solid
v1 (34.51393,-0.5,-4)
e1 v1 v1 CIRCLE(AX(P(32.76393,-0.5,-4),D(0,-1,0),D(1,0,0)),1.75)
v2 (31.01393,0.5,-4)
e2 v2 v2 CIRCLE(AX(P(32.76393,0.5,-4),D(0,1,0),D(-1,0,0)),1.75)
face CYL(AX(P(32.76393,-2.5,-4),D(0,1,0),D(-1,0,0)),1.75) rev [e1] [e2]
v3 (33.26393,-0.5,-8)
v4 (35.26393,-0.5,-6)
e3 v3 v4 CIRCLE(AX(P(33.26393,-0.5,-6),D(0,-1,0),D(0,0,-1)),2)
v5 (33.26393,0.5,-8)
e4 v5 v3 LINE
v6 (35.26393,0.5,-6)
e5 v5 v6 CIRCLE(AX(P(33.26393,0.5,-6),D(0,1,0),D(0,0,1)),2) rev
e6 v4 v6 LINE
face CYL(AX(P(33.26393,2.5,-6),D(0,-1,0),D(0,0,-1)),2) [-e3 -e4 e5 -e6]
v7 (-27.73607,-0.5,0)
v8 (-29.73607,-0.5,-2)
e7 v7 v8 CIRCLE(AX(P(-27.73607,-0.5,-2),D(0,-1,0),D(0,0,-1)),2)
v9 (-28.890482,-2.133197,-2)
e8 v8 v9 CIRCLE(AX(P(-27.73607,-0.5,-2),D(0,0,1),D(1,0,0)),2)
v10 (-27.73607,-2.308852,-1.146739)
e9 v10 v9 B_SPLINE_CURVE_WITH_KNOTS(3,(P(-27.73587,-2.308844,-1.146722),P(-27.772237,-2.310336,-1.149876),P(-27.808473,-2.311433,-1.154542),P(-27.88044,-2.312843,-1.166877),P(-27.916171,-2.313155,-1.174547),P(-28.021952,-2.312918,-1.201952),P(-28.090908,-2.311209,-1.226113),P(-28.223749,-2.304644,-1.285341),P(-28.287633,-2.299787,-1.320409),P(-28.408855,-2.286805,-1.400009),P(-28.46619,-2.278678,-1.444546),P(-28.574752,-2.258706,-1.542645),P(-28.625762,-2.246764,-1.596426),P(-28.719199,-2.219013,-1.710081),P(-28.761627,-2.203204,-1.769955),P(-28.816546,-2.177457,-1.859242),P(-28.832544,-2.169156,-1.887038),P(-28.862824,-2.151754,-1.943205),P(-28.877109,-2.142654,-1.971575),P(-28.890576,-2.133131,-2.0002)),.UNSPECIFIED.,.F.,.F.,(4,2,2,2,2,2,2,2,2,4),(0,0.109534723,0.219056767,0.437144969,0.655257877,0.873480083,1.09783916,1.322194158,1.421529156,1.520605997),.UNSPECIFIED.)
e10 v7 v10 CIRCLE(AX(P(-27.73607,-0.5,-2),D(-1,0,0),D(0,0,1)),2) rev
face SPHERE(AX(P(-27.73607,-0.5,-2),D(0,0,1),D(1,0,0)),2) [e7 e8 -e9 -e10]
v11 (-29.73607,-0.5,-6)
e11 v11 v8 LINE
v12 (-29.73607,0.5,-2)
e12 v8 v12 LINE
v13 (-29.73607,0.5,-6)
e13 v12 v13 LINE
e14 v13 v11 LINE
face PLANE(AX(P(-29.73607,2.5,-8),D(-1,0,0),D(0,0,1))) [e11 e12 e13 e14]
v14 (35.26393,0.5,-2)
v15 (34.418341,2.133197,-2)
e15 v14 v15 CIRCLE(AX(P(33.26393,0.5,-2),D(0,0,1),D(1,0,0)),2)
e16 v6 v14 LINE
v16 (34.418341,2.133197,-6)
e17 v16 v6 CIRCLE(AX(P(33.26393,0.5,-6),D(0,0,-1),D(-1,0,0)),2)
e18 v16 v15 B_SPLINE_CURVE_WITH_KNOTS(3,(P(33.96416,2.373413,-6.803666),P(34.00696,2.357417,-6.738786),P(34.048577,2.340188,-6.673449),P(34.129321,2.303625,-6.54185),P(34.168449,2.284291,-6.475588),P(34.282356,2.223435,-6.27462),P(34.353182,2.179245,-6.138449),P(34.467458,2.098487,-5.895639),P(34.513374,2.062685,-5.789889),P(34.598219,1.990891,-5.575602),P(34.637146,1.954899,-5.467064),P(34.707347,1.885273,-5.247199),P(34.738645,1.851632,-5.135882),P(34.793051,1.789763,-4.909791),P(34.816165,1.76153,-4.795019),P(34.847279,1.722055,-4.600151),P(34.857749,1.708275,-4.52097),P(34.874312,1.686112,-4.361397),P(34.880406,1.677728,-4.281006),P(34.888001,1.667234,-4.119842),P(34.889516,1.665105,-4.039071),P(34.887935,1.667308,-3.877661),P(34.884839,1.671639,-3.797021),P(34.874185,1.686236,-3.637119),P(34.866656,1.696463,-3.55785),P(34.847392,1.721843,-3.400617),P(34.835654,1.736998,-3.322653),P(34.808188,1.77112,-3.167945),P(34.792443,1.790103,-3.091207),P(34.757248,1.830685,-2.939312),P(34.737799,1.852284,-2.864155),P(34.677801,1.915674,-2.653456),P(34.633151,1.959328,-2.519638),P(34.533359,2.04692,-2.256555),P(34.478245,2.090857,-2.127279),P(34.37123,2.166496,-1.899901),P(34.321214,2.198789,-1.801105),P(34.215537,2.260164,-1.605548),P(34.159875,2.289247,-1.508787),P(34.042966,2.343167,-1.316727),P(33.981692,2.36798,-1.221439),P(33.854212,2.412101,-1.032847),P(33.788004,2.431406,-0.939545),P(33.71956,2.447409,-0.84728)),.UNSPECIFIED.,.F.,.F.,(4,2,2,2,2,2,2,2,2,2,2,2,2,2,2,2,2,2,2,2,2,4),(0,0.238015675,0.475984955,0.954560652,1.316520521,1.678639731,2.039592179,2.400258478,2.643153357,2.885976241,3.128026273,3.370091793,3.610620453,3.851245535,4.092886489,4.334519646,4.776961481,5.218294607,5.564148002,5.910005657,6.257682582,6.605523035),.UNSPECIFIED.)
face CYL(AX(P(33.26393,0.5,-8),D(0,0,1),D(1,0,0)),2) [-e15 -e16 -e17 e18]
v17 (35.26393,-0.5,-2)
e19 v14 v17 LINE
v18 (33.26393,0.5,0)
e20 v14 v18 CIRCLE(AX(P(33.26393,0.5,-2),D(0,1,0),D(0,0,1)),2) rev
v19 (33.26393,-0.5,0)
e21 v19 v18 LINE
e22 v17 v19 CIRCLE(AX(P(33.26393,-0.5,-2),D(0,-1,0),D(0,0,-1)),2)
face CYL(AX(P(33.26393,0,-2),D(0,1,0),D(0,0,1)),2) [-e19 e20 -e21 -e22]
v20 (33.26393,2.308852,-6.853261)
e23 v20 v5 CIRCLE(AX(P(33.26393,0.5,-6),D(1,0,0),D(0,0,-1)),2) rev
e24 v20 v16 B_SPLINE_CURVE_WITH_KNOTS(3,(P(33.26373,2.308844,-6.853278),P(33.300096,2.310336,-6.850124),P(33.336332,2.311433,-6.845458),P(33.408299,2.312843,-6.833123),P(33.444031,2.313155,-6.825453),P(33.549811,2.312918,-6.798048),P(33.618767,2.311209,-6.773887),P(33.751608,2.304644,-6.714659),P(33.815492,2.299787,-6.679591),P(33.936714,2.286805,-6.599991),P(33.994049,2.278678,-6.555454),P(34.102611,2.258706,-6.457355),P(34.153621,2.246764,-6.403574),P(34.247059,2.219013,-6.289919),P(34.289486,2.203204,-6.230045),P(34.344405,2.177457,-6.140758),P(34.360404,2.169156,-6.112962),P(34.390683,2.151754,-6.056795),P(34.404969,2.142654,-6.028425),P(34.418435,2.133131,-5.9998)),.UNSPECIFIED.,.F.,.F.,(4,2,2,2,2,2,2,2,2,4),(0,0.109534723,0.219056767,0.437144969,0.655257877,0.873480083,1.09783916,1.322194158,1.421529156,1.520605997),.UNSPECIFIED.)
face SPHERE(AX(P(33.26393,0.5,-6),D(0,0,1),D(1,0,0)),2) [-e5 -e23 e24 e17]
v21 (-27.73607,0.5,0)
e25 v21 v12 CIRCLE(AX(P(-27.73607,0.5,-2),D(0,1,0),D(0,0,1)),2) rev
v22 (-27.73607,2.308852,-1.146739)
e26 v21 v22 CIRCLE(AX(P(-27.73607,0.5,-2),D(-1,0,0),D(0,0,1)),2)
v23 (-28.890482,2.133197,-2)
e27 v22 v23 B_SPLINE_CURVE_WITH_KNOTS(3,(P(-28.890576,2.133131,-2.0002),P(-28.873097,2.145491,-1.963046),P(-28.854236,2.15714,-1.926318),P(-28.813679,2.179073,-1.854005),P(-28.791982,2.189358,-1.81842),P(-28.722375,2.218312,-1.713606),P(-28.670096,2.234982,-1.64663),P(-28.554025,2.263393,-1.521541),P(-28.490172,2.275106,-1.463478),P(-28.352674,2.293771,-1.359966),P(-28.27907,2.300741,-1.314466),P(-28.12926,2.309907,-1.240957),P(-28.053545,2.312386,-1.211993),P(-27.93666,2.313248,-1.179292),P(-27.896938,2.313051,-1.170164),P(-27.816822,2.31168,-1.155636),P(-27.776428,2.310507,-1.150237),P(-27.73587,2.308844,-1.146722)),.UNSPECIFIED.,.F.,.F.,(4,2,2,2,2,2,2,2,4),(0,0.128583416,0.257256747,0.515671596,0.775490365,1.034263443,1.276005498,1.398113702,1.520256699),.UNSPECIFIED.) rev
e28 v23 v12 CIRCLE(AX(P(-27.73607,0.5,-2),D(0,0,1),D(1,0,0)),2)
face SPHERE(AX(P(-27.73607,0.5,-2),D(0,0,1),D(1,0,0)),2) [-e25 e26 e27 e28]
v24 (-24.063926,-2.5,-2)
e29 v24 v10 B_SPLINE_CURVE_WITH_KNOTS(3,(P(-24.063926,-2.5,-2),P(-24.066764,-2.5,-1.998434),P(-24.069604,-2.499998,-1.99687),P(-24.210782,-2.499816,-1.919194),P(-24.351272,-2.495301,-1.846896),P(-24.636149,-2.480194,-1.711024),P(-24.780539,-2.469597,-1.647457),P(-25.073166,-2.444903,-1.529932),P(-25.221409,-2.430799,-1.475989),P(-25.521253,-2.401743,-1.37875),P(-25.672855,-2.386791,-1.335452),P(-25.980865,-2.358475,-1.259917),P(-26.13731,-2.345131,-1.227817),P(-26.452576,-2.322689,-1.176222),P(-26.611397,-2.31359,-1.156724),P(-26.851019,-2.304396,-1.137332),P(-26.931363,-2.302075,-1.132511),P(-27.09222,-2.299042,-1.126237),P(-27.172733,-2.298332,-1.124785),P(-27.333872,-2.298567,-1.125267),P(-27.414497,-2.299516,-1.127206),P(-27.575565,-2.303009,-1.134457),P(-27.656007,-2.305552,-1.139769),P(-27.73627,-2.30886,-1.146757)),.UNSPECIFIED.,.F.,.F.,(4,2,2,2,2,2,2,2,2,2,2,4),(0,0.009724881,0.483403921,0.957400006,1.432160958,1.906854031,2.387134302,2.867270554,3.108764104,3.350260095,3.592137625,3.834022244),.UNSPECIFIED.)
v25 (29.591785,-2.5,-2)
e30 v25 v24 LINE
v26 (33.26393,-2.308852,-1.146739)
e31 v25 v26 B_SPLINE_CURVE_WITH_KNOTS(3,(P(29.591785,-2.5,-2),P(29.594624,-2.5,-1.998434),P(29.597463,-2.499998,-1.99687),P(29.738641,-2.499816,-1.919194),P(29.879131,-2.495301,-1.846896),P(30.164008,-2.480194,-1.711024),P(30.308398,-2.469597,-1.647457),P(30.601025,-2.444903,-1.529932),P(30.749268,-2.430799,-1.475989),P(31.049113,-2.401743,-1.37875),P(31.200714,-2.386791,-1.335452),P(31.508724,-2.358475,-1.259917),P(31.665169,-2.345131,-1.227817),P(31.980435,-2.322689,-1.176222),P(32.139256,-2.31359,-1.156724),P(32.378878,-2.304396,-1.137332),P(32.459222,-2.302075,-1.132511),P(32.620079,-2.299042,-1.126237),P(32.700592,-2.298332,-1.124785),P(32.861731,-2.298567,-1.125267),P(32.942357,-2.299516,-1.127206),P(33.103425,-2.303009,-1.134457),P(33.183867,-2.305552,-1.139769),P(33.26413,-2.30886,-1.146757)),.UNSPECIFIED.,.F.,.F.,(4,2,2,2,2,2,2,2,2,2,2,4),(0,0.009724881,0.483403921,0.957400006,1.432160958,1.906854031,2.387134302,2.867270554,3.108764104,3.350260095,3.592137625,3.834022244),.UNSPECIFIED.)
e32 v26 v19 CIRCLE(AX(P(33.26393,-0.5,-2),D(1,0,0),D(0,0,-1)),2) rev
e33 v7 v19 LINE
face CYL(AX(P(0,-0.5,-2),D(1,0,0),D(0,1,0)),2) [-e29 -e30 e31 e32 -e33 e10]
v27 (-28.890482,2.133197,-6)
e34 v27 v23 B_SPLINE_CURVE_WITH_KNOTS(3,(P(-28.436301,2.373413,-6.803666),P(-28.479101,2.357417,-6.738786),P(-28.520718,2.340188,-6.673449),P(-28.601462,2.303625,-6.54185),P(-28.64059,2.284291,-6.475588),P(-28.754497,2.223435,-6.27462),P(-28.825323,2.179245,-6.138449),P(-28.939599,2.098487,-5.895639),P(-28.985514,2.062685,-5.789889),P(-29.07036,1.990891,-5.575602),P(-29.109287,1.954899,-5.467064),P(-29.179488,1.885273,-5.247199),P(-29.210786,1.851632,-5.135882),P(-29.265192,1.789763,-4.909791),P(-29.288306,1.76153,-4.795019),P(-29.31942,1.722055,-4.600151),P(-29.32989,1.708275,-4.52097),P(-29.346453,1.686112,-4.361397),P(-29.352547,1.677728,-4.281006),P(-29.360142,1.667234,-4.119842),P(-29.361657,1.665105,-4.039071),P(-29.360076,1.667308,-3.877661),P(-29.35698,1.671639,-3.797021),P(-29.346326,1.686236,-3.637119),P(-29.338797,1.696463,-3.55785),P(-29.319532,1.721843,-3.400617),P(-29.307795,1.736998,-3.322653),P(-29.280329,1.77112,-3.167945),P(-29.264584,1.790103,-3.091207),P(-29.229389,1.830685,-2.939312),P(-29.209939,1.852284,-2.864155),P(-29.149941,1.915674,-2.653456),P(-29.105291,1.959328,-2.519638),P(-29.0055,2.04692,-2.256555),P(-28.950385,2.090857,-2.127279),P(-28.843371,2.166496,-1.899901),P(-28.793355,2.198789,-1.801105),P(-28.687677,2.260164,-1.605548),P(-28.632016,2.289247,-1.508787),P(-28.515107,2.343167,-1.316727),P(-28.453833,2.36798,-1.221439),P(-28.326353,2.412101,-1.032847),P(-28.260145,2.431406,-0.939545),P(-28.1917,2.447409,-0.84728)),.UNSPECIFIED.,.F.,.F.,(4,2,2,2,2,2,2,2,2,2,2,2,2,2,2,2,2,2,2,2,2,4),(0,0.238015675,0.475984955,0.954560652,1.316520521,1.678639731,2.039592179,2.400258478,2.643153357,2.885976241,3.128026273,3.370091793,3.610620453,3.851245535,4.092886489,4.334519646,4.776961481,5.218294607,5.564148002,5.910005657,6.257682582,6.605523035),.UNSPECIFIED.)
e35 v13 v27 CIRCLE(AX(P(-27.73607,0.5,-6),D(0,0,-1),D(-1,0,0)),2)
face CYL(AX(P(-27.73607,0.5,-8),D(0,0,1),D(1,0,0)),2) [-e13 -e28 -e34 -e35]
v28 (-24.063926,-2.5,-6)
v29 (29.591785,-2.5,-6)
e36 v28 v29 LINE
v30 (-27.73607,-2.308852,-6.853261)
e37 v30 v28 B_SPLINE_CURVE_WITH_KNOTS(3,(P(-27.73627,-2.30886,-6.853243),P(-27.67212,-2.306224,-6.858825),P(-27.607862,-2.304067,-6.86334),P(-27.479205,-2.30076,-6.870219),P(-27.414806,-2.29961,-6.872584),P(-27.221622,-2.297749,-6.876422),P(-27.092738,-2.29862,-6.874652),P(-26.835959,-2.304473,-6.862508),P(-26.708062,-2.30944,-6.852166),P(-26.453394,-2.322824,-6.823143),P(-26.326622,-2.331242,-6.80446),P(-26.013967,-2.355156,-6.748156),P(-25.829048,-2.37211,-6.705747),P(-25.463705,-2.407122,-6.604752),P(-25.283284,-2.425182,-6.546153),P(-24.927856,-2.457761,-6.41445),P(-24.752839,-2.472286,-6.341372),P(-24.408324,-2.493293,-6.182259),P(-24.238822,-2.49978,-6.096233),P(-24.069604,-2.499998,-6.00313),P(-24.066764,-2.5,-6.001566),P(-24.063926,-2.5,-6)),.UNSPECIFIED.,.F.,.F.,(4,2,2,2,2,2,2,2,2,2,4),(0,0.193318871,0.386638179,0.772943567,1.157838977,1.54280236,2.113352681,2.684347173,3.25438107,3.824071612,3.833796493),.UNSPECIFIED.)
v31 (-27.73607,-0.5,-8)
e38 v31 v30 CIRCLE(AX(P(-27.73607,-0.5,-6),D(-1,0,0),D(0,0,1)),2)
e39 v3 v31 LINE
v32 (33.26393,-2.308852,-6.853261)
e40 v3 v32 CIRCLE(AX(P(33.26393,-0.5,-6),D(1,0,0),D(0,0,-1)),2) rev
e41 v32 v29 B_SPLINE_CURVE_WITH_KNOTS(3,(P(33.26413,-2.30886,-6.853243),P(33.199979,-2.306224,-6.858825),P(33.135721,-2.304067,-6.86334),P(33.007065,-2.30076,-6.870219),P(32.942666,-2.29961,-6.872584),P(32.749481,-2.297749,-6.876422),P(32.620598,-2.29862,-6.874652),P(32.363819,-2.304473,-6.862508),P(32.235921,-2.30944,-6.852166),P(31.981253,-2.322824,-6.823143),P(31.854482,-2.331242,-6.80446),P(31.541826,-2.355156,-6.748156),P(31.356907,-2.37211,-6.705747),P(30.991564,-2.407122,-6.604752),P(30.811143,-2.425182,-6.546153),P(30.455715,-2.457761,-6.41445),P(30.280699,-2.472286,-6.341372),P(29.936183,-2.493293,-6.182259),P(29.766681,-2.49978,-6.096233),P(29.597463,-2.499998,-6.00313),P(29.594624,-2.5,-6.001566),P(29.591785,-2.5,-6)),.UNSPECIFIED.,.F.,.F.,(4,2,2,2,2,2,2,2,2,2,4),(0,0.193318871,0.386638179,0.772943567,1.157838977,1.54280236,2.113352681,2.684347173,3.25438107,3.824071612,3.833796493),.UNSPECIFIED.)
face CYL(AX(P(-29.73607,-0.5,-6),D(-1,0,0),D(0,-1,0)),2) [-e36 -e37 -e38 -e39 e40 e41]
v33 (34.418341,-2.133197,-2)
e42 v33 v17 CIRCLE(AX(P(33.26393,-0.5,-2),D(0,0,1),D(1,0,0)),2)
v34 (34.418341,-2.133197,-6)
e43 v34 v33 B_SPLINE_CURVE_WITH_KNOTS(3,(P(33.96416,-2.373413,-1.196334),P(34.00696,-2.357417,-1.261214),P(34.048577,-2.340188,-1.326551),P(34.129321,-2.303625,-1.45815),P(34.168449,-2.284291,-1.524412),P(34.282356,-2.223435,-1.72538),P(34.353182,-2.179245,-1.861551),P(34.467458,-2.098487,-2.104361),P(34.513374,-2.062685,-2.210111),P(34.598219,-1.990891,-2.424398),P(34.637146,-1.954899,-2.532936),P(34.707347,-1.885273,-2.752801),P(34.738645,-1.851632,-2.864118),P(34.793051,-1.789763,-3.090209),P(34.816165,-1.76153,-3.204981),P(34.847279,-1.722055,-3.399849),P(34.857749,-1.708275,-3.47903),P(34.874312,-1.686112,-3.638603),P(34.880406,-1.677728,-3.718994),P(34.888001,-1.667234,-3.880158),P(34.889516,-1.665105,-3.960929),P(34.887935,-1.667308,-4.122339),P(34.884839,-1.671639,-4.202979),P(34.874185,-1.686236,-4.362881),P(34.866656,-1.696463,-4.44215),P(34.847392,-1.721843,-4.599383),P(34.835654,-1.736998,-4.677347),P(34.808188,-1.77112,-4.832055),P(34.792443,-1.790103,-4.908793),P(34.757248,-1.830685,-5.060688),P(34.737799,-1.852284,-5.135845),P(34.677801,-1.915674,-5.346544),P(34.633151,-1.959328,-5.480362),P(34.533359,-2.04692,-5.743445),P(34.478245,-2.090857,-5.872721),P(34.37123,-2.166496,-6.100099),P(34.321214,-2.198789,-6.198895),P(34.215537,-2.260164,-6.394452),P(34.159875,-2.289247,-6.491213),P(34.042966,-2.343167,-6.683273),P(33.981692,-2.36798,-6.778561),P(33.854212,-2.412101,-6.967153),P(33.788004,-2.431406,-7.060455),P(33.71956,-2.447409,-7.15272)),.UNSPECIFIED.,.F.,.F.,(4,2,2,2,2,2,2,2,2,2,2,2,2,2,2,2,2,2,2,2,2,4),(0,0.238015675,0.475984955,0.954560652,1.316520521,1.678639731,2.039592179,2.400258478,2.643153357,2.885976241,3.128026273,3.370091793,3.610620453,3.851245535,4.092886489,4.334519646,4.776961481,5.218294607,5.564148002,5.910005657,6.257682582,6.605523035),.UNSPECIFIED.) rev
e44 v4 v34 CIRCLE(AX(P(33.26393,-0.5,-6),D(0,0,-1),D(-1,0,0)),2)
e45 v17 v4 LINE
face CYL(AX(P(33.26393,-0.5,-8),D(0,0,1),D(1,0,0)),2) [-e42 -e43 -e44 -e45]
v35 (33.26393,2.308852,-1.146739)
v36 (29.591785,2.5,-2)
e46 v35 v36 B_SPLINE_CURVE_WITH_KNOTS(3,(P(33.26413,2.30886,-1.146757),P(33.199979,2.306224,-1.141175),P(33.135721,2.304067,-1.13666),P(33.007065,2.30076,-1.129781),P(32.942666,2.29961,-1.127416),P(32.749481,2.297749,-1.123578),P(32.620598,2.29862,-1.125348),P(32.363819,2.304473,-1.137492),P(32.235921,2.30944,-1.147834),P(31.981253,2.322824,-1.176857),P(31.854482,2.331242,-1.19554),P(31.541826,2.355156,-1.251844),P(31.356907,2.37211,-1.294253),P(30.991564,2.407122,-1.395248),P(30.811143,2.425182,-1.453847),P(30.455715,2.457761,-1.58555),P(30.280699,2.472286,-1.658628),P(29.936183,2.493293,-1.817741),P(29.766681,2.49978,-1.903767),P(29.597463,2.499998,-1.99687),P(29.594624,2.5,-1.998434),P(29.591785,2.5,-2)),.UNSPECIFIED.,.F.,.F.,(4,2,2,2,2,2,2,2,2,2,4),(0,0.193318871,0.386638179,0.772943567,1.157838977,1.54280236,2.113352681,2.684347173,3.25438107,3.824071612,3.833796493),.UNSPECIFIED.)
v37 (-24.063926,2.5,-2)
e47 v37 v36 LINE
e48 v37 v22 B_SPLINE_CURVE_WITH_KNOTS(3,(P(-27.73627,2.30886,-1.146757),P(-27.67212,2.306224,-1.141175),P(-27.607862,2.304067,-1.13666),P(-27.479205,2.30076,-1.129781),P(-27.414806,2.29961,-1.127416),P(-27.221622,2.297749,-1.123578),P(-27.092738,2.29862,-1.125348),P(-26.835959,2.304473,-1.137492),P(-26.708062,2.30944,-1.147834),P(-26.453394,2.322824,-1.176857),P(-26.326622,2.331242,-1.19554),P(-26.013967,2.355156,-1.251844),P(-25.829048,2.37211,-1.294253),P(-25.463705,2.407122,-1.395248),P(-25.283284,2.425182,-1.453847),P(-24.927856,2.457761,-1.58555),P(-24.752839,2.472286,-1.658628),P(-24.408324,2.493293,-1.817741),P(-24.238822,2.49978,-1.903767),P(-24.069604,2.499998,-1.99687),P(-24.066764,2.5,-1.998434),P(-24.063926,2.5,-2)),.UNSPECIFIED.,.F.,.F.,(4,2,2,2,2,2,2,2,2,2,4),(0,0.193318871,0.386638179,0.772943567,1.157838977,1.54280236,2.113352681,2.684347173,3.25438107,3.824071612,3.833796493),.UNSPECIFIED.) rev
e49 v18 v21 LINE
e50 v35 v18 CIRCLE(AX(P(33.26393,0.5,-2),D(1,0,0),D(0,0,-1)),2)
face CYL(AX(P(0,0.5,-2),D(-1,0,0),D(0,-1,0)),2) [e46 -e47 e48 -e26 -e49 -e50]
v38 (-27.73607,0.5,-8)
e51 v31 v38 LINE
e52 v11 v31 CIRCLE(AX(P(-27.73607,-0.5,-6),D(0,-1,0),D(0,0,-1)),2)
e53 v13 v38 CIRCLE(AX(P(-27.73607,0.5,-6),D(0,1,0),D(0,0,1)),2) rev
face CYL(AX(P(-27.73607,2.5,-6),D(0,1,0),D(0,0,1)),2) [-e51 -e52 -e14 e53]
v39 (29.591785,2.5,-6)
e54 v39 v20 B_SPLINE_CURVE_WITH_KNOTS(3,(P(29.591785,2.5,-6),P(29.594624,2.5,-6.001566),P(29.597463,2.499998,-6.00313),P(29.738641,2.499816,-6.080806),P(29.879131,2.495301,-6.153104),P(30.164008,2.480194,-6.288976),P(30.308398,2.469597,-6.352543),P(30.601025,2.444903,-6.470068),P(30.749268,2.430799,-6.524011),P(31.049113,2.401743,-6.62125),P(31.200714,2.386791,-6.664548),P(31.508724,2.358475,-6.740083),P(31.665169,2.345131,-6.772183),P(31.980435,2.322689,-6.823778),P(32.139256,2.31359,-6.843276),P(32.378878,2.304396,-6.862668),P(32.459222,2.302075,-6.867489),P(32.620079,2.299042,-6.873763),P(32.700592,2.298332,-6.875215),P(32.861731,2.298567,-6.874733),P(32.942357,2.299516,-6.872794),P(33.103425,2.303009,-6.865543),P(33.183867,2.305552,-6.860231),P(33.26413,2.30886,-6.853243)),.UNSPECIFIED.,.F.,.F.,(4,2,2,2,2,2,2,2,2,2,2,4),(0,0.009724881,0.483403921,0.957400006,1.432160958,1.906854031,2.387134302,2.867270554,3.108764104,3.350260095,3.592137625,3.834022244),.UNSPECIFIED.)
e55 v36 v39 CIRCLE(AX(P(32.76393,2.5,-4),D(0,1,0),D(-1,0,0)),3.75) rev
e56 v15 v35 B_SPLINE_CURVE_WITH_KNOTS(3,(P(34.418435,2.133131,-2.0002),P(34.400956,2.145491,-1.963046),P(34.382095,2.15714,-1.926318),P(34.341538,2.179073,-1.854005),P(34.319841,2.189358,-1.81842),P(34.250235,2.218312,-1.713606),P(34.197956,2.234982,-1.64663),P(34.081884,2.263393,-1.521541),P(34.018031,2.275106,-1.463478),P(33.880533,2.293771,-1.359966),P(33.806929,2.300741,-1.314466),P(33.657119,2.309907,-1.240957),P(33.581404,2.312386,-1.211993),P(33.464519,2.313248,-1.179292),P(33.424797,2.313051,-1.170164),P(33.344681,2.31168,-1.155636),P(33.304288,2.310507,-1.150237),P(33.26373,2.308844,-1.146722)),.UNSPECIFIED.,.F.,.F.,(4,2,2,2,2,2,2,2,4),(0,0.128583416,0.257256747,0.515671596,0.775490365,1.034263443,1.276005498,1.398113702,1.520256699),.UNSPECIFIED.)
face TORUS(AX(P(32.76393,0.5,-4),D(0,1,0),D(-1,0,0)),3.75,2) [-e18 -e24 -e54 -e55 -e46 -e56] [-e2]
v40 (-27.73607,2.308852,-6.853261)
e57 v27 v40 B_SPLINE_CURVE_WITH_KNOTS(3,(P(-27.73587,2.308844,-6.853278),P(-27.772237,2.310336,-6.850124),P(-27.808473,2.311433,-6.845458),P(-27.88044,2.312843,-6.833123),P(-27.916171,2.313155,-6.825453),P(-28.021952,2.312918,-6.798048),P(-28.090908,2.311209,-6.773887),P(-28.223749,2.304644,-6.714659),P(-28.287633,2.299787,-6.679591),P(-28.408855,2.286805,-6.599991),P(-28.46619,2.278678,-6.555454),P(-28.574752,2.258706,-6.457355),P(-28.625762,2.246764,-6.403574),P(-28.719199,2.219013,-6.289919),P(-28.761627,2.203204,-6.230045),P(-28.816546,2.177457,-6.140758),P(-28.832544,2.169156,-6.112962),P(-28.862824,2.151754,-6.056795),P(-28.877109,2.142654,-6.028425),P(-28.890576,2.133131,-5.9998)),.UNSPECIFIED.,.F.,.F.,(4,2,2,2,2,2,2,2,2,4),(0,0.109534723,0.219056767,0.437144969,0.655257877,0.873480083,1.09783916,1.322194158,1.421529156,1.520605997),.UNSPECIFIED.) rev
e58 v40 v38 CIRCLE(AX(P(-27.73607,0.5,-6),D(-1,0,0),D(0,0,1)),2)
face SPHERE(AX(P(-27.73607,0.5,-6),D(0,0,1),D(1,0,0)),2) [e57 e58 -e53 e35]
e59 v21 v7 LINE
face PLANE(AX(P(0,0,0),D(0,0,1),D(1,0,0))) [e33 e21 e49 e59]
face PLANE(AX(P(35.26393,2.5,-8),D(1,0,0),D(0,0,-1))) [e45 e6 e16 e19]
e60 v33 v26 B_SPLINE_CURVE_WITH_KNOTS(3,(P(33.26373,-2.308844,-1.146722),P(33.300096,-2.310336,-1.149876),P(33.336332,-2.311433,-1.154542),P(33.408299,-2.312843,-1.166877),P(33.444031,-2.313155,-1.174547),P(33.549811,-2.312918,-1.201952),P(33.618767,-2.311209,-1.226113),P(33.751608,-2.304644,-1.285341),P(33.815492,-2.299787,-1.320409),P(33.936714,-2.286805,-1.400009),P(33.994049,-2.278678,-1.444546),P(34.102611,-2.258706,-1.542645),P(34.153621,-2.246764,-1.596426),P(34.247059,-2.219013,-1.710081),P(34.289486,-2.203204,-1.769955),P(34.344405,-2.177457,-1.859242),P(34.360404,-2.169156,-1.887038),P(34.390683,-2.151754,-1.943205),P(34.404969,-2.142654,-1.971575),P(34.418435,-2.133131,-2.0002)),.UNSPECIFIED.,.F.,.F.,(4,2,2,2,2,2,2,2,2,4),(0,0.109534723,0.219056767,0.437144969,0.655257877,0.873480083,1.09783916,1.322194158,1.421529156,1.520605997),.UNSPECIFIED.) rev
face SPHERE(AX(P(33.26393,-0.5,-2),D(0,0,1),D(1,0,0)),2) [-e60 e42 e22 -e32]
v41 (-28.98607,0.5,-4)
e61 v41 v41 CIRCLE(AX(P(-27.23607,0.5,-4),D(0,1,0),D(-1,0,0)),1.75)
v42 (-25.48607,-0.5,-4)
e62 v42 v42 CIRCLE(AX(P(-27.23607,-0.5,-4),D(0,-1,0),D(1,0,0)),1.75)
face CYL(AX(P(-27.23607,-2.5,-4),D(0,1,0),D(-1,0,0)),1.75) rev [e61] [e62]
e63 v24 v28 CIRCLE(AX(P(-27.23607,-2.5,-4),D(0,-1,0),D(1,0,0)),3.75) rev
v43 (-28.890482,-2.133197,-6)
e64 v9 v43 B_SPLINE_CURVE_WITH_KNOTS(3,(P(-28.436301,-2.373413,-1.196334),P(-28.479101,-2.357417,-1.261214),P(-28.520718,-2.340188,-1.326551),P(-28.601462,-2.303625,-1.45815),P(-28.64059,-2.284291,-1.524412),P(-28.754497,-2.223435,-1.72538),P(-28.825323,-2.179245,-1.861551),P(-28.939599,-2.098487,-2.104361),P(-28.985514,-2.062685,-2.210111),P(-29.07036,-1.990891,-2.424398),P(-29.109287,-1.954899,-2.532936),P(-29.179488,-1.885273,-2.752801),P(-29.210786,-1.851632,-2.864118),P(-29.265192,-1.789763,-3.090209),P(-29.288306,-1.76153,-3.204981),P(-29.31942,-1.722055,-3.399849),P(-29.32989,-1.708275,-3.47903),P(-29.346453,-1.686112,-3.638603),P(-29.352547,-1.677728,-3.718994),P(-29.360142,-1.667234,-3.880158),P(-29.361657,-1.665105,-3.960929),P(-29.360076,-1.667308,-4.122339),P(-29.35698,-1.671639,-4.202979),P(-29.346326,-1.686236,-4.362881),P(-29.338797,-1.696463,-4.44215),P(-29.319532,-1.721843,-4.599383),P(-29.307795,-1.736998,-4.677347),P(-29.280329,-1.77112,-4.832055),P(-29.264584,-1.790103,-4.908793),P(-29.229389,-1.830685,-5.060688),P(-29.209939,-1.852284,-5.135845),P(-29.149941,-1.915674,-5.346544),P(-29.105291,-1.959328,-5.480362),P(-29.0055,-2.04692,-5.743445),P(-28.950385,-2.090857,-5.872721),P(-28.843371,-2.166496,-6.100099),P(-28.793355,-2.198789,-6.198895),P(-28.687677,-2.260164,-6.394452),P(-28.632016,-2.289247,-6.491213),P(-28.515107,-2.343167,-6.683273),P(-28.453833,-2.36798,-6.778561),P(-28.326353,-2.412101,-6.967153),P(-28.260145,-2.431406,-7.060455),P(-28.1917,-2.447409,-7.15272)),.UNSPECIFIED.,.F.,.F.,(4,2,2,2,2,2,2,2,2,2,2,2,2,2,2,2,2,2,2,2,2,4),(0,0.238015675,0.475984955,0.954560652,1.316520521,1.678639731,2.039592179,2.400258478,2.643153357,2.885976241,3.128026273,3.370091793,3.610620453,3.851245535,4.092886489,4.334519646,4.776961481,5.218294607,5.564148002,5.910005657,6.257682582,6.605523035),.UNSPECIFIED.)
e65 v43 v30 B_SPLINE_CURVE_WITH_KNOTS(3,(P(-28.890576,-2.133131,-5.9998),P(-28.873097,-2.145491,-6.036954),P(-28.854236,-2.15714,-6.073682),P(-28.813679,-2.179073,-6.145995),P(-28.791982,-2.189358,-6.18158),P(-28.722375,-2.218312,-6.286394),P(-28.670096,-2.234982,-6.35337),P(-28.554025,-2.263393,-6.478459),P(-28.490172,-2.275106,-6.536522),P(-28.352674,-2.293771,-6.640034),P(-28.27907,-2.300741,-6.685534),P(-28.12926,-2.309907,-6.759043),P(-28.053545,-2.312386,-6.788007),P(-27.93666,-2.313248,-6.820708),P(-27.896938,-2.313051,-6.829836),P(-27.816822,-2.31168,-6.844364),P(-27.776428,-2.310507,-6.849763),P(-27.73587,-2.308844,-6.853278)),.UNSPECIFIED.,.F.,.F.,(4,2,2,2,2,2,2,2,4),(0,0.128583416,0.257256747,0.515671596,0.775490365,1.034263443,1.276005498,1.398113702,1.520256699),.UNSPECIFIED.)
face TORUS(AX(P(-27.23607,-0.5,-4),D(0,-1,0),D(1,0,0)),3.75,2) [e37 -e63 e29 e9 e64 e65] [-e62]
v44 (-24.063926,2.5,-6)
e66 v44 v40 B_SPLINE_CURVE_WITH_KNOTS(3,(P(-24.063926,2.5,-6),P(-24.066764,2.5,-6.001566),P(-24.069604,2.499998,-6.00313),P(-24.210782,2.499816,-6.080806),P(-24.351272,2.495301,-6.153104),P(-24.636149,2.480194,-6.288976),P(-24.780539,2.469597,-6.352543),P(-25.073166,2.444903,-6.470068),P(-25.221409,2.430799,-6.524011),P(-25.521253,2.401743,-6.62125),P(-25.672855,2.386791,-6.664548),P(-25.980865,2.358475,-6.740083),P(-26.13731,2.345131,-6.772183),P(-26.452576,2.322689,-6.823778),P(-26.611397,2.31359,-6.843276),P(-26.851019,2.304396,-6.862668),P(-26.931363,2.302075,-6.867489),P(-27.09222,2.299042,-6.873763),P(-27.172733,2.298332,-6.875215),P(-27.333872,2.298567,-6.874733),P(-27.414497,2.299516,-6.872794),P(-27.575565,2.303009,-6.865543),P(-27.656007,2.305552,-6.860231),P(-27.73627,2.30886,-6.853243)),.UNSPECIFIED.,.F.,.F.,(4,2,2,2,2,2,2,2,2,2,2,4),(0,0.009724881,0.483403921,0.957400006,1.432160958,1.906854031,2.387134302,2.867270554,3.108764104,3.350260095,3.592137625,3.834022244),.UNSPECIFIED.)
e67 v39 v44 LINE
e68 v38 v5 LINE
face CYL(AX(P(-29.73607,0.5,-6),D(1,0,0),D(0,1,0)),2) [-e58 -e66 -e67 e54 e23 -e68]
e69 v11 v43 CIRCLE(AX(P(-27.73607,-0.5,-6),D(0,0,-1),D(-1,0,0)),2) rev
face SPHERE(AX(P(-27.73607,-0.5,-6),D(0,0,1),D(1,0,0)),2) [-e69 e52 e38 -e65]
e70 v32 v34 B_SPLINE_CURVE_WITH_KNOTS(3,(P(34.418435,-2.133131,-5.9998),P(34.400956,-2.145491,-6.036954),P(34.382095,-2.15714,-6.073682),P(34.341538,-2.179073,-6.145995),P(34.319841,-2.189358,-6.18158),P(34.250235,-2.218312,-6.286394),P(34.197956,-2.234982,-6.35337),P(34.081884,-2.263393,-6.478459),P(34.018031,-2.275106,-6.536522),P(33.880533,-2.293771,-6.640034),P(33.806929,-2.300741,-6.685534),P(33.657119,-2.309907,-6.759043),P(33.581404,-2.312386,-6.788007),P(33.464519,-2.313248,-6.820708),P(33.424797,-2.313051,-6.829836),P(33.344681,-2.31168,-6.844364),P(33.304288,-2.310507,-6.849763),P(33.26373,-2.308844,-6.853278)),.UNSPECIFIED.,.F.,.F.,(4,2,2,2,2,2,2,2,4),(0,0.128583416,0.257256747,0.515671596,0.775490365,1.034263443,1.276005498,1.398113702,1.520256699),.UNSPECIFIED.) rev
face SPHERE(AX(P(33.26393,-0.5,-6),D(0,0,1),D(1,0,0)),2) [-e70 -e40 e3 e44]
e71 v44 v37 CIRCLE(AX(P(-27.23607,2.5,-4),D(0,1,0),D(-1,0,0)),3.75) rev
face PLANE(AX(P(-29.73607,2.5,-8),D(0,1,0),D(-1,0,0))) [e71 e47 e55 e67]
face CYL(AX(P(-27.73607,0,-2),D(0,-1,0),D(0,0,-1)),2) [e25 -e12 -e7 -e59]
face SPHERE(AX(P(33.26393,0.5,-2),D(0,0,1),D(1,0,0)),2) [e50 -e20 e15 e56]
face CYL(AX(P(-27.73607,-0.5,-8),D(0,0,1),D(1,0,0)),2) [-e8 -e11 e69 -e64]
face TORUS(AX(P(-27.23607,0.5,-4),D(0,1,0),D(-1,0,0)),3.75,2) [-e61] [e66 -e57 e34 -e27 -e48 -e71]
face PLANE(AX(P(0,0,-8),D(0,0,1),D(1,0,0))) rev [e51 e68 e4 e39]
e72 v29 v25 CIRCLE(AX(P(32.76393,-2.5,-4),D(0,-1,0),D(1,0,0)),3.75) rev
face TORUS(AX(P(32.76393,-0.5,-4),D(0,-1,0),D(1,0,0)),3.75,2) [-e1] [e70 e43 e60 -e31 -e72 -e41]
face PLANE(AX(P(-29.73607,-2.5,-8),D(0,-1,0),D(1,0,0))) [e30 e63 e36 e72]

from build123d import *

# Parameters (mm, degrees)
SKETCH1_W           = 65
SKETCH1_H           = 5
BOSS_EXTRUDE1_DEPTH = 8
SKETCH2_R           = 1.75
CUT_EXTRUDE1_DEPTH  = 37.504037204
FILLET1_R           = 2


with BuildPart() as part:
    # Sketch1 → Boss-Extrude1 (new body)
    with BuildSketch(Plane.XY):
        with Locations((2.763929619, 0)):
            Rectangle(SKETCH1_W, SKETCH1_H)
    extrude(amount=-BOSS_EXTRUDE1_DEPTH)

    # Sketch2 → Cut-Extrude1 (cut, through all)
    with BuildSketch(Plane(origin=(0, 2.5, 0), x_dir=(1, 0, 0), z_dir=(0, 1, 0))):
        with Locations(Location((32.763929619, 4, 0), (0, 0, 180))):
            Circle(SKETCH2_R)
        with Locations((-27.236070381, 4)):
            Circle(SKETCH2_R)
    extrude(amount=-CUT_EXTRUDE1_DEPTH, mode=Mode.SUBTRACT)

    # Fillet1
    # the kernel refuses this fillet: 2 mm, written as the material it takes off along each edge
    with BuildSketch(Plane(origin=(33.263929619, 0.5, -6), x_dir=(0, 0, -1), z_dir=(0, 1, 0))) as fillet1_piece_1_section:
        Polygon((0, 0), (FILLET1_R, 0), (FILLET1_R, -FILLET1_R), (0, -FILLET1_R), align=None)
    fillet1_piece_1 = extrude(amount=FILLET1_R, mode=Mode.PRIVATE)
    fillet1_piece_1 = fillet1_piece_1 - Plane(origin=(33.263929619, 0.5, -6), x_dir=(-0.7071067811865475, 0, 0.7071067811865475), z_dir=(0, 1, 0)) * Sphere(FILLET1_R, mode=Mode.PRIVATE)
    add(fillet1_piece_1, mode=Mode.SUBTRACT)
    with BuildSketch(Plane(origin=(33.263929619, -0.5, -6), x_dir=(1, 0, 0), z_dir=(0, 0, -1))) as fillet1_piece_2_section:
        Polygon((0, 0), (FILLET1_R, 0), (FILLET1_R, FILLET1_R), (0, FILLET1_R), align=None)
    fillet1_piece_2 = extrude(amount=FILLET1_R, mode=Mode.PRIVATE)
    fillet1_piece_2 = fillet1_piece_2 - Plane(origin=(33.263929619, -0.5, -6), x_dir=(-0.7071067811865475, 0.7071067811865475, 0), z_dir=(0, 0, -1)) * Sphere(FILLET1_R, mode=Mode.PRIVATE)
    add(fillet1_piece_2, mode=Mode.SUBTRACT)
    with BuildSketch(Plane(origin=(-27.736070381, 0.5, -6), x_dir=(-1, 0, 0), z_dir=(0, 1, 0))) as fillet1_piece_3_section:
        Polygon((0, 0), (FILLET1_R, 0), (FILLET1_R, -FILLET1_R), (0, -FILLET1_R), align=None)
    fillet1_piece_3 = extrude(amount=FILLET1_R, mode=Mode.PRIVATE)
    fillet1_piece_3 = fillet1_piece_3 - Plane(origin=(-27.736070381, 0.5, -6), x_dir=(0.7071067811865475, 0, 0.7071067811865475), z_dir=(0, 1, 0)) * Sphere(FILLET1_R, mode=Mode.PRIVATE)
    add(fillet1_piece_3, mode=Mode.SUBTRACT)
    with BuildSketch(Plane(origin=(-27.736070381, -0.5, -6), x_dir=(0, 0, -1), z_dir=(-1, 0, 0))) as fillet1_piece_4_section:
        Polygon((0, 0), (FILLET1_R, 0), (FILLET1_R, FILLET1_R), (0, FILLET1_R), align=None)
    fillet1_piece_4 = extrude(amount=FILLET1_R, mode=Mode.PRIVATE)
    fillet1_piece_4 = fillet1_piece_4 - Plane(origin=(-27.736070381, -0.5, -6), x_dir=(0, 0.7071067811865475, 0.7071067811865475), z_dir=(-1, 0, 0)) * Sphere(FILLET1_R, mode=Mode.PRIVATE)
    add(fillet1_piece_4, mode=Mode.SUBTRACT)
    with BuildSketch(Plane(origin=(-27.736070381, 0.5, -2), x_dir=(-1, 0, 0), z_dir=(0, 1, 0))) as fillet1_piece_5_section:
        Polygon((0, 0), (FILLET1_R, 0), (FILLET1_R, FILLET1_R), (0, FILLET1_R), align=None)
    fillet1_piece_5 = extrude(amount=FILLET1_R, mode=Mode.PRIVATE)
    fillet1_piece_5 = fillet1_piece_5 - Plane(origin=(-27.736070381, 0.5, -2), x_dir=(0.7071067811865475, 0, -0.7071067811865475), z_dir=(0, 1, 0)) * Sphere(FILLET1_R, mode=Mode.PRIVATE)
    add(fillet1_piece_5, mode=Mode.SUBTRACT)
    with BuildSketch(Plane(origin=(33.263929619, 0.5, -2), x_dir=(0, 0, 1), z_dir=(0, 1, 0))) as fillet1_piece_6_section:
        Polygon((0, 0), (FILLET1_R, 0), (FILLET1_R, FILLET1_R), (0, FILLET1_R), align=None)
    fillet1_piece_6 = extrude(amount=FILLET1_R, mode=Mode.PRIVATE)
    fillet1_piece_6 = fillet1_piece_6 - Plane(origin=(33.263929619, 0.5, -2), x_dir=(-0.7071067811865475, 0, -0.7071067811865475), z_dir=(0, 1, 0)) * Sphere(FILLET1_R, mode=Mode.PRIVATE)
    add(fillet1_piece_6, mode=Mode.SUBTRACT)
    with BuildSketch(Plane(origin=(33.263929619, -0.5, -2), x_dir=(1, 0, 0), z_dir=(0, 0, 1))) as fillet1_piece_7_section:
        Polygon((0, 0), (FILLET1_R, 0), (FILLET1_R, -FILLET1_R), (0, -FILLET1_R), align=None)
    fillet1_piece_7 = extrude(amount=FILLET1_R, mode=Mode.PRIVATE)
    fillet1_piece_7 = fillet1_piece_7 - Plane(origin=(33.263929619, -0.5, -2), x_dir=(-0.7071067811865475, 0.7071067811865475, 0), z_dir=(0, 0, 1)) * Sphere(FILLET1_R, mode=Mode.PRIVATE)
    add(fillet1_piece_7, mode=Mode.SUBTRACT)
    with BuildSketch(Plane(origin=(-27.736070381, -0.5, -2), x_dir=(0, 0, 1), z_dir=(-1, 0, 0))) as fillet1_piece_8_section:
        Polygon((0, 0), (FILLET1_R, 0), (FILLET1_R, -FILLET1_R), (0, -FILLET1_R), align=None)
    fillet1_piece_8 = extrude(amount=FILLET1_R, mode=Mode.PRIVATE)
    fillet1_piece_8 = fillet1_piece_8 - Plane(origin=(-27.736070381, -0.5, -2), x_dir=(0, 0.7071067811865475, -0.7071067811865475), z_dir=(-1, 0, 0)) * Sphere(FILLET1_R, mode=Mode.PRIVATE)
    add(fillet1_piece_8, mode=Mode.SUBTRACT)
    with BuildSketch(Plane(origin=(35.263929619, 0.5, -8), x_dir=(-1, 0, 0), z_dir=(0, -1, 0)), Plane(origin=(-29.736070381, -0.5, 0), x_dir=(0, 0, -1), z_dir=(0, 1, 0))) as fillet1_piece_9:
        with BuildLine():
            CenterArc((FILLET1_R, -FILLET1_R), FILLET1_R, 90, 90)
            Line((0, -FILLET1_R), (0, 0))
            Line((0, 0), (FILLET1_R, 0))
        make_face()
    extrude(amount=1, mode=Mode.SUBTRACT)
    with BuildSketch(Plane(origin=(-27.736070381, 2.5, -8), x_dir=(0, 0, 1), z_dir=(1, 0, 0)), Plane(origin=(33.263929619, -2.5, 0), x_dir=(0, 1, 0), z_dir=(-1, 0, 0))) as fillet1_piece_10:
        with BuildLine():
            CenterArc((FILLET1_R, FILLET1_R), FILLET1_R, 180, 90)
            Line((0, FILLET1_R), (0, 0))
            Line((0, 0), (FILLET1_R, 0))
        make_face()
    extrude(amount=61, mode=Mode.SUBTRACT)
    with BuildSketch(Plane(origin=(-27.236070381, 2.5, -4), x_dir=(1, 0, 0), z_dir=(0, 0, 1))) as fillet1_piece_11:
        with BuildLine():
            CenterArc((1.75 + FILLET1_R, -FILLET1_R), FILLET1_R, 90, 90)
            Line((1.75, -FILLET1_R), (1.75, 0))
            Line((1.75, 0), (1.75 + FILLET1_R, 0))
        make_face()
    revolve(axis=Axis((-27.236070381, 2.5, -4), (0, 1, 0)), mode=Mode.SUBTRACT)
    with BuildSketch(Plane(origin=(-27.236070381, -2.5, -4), x_dir=(1, 0, 0), z_dir=(0, 0, 1))) as fillet1_piece_12:
        with BuildLine():
            CenterArc((1.75 + FILLET1_R, FILLET1_R), FILLET1_R, 180, 90)
            Line((1.75 + FILLET1_R, 0), (1.75, 0))
            Line((1.75, 0), (1.75, FILLET1_R))
        make_face()
    revolve(axis=Axis((-27.236070381, -2.5, -4), (0, 1, 0)), mode=Mode.SUBTRACT)
    with BuildSketch(Plane(origin=(32.763929619, -2.5, -4), x_dir=(-1, 0, 0), z_dir=(0, 0, -1))) as fillet1_piece_13:
        with BuildLine():
            CenterArc((1.75 + FILLET1_R, FILLET1_R), FILLET1_R, 180, 90)
            Line((1.75 + FILLET1_R, 0), (1.75, 0))
            Line((1.75, 0), (1.75, FILLET1_R))
        make_face()
    revolve(axis=Axis((32.763929619, -2.5, -4), (0, 1, 0)), mode=Mode.SUBTRACT)
    with BuildSketch(Plane(origin=(32.763929619, 2.5, -4), x_dir=(-1, 0, 0), z_dir=(0, 0, -1))) as fillet1_piece_14:
        with BuildLine():
            CenterArc((1.75 + FILLET1_R, -FILLET1_R), FILLET1_R, 90, 90)
            Line((1.75, -FILLET1_R), (1.75, 0))
            Line((1.75, 0), (1.75 + FILLET1_R, 0))
        make_face()
    revolve(axis=Axis((32.763929619, 2.5, -4), (0, 1, 0)), mode=Mode.SUBTRACT)
    with BuildSketch(Plane(origin=(-29.736070381, -0.5, -8), x_dir=(0, 0, 1), z_dir=(0, 1, 0)), Plane(origin=(35.263929619, 0.5, 0), x_dir=(-1, 0, 0), z_dir=(0, -1, 0))) as fillet1_piece_15:
        with BuildLine():
            CenterArc((FILLET1_R, FILLET1_R), FILLET1_R, 180, 90)
            Line((0, FILLET1_R), (0, 0))
            Line((0, 0), (FILLET1_R, 0))
        make_face()
    extrude(amount=1, mode=Mode.SUBTRACT)
    with BuildSketch(Plane(origin=(-27.736070381, 2.5, 0), x_dir=(0, 0, -1), z_dir=(1, 0, 0)), Plane(origin=(33.263929619, -2.5, -8), x_dir=(0, 1, 0), z_dir=(-1, 0, 0))) as fillet1_piece_16:
        with BuildLine():
            CenterArc((FILLET1_R, -FILLET1_R), FILLET1_R, 90, 90)
            Line((0, -FILLET1_R), (0, 0))
            Line((0, 0), (FILLET1_R, 0))
        make_face()
    extrude(amount=61, mode=Mode.SUBTRACT)
    with BuildSketch(Plane(origin=(-29.736070381, 2.5, -2), x_dir=(1, 0, 0), z_dir=(0, 0, -1)), Plane(origin=(-29.736070381, -2.5, -2), x_dir=(0, 1, 0), z_dir=(0, 0, -1))) as fillet1_piece_17:
        with BuildLine():
            CenterArc((FILLET1_R, FILLET1_R), FILLET1_R, 180, 90)
            Line((0, FILLET1_R), (0, 0))
            Line((0, 0), (FILLET1_R, 0))
        make_face()
    extrude(amount=4, mode=Mode.SUBTRACT)
    with BuildSketch(Plane(origin=(35.263929619, 2.5, -2), x_dir=(-1, 0, 0), z_dir=(0, 0, -1)), Plane(origin=(35.263929619, -2.5, -2), x_dir=(0, 1, 0), z_dir=(0, 0, -1))) as fillet1_piece_18:
        with BuildLine():
            CenterArc((FILLET1_R, -FILLET1_R), FILLET1_R, 90, 90)
            Line((0, -FILLET1_R), (0, 0))
            Line((0, 0), (FILLET1_R, 0))
        make_face()
    extrude(amount=4, mode=Mode.SUBTRACT)


solid = part.part
